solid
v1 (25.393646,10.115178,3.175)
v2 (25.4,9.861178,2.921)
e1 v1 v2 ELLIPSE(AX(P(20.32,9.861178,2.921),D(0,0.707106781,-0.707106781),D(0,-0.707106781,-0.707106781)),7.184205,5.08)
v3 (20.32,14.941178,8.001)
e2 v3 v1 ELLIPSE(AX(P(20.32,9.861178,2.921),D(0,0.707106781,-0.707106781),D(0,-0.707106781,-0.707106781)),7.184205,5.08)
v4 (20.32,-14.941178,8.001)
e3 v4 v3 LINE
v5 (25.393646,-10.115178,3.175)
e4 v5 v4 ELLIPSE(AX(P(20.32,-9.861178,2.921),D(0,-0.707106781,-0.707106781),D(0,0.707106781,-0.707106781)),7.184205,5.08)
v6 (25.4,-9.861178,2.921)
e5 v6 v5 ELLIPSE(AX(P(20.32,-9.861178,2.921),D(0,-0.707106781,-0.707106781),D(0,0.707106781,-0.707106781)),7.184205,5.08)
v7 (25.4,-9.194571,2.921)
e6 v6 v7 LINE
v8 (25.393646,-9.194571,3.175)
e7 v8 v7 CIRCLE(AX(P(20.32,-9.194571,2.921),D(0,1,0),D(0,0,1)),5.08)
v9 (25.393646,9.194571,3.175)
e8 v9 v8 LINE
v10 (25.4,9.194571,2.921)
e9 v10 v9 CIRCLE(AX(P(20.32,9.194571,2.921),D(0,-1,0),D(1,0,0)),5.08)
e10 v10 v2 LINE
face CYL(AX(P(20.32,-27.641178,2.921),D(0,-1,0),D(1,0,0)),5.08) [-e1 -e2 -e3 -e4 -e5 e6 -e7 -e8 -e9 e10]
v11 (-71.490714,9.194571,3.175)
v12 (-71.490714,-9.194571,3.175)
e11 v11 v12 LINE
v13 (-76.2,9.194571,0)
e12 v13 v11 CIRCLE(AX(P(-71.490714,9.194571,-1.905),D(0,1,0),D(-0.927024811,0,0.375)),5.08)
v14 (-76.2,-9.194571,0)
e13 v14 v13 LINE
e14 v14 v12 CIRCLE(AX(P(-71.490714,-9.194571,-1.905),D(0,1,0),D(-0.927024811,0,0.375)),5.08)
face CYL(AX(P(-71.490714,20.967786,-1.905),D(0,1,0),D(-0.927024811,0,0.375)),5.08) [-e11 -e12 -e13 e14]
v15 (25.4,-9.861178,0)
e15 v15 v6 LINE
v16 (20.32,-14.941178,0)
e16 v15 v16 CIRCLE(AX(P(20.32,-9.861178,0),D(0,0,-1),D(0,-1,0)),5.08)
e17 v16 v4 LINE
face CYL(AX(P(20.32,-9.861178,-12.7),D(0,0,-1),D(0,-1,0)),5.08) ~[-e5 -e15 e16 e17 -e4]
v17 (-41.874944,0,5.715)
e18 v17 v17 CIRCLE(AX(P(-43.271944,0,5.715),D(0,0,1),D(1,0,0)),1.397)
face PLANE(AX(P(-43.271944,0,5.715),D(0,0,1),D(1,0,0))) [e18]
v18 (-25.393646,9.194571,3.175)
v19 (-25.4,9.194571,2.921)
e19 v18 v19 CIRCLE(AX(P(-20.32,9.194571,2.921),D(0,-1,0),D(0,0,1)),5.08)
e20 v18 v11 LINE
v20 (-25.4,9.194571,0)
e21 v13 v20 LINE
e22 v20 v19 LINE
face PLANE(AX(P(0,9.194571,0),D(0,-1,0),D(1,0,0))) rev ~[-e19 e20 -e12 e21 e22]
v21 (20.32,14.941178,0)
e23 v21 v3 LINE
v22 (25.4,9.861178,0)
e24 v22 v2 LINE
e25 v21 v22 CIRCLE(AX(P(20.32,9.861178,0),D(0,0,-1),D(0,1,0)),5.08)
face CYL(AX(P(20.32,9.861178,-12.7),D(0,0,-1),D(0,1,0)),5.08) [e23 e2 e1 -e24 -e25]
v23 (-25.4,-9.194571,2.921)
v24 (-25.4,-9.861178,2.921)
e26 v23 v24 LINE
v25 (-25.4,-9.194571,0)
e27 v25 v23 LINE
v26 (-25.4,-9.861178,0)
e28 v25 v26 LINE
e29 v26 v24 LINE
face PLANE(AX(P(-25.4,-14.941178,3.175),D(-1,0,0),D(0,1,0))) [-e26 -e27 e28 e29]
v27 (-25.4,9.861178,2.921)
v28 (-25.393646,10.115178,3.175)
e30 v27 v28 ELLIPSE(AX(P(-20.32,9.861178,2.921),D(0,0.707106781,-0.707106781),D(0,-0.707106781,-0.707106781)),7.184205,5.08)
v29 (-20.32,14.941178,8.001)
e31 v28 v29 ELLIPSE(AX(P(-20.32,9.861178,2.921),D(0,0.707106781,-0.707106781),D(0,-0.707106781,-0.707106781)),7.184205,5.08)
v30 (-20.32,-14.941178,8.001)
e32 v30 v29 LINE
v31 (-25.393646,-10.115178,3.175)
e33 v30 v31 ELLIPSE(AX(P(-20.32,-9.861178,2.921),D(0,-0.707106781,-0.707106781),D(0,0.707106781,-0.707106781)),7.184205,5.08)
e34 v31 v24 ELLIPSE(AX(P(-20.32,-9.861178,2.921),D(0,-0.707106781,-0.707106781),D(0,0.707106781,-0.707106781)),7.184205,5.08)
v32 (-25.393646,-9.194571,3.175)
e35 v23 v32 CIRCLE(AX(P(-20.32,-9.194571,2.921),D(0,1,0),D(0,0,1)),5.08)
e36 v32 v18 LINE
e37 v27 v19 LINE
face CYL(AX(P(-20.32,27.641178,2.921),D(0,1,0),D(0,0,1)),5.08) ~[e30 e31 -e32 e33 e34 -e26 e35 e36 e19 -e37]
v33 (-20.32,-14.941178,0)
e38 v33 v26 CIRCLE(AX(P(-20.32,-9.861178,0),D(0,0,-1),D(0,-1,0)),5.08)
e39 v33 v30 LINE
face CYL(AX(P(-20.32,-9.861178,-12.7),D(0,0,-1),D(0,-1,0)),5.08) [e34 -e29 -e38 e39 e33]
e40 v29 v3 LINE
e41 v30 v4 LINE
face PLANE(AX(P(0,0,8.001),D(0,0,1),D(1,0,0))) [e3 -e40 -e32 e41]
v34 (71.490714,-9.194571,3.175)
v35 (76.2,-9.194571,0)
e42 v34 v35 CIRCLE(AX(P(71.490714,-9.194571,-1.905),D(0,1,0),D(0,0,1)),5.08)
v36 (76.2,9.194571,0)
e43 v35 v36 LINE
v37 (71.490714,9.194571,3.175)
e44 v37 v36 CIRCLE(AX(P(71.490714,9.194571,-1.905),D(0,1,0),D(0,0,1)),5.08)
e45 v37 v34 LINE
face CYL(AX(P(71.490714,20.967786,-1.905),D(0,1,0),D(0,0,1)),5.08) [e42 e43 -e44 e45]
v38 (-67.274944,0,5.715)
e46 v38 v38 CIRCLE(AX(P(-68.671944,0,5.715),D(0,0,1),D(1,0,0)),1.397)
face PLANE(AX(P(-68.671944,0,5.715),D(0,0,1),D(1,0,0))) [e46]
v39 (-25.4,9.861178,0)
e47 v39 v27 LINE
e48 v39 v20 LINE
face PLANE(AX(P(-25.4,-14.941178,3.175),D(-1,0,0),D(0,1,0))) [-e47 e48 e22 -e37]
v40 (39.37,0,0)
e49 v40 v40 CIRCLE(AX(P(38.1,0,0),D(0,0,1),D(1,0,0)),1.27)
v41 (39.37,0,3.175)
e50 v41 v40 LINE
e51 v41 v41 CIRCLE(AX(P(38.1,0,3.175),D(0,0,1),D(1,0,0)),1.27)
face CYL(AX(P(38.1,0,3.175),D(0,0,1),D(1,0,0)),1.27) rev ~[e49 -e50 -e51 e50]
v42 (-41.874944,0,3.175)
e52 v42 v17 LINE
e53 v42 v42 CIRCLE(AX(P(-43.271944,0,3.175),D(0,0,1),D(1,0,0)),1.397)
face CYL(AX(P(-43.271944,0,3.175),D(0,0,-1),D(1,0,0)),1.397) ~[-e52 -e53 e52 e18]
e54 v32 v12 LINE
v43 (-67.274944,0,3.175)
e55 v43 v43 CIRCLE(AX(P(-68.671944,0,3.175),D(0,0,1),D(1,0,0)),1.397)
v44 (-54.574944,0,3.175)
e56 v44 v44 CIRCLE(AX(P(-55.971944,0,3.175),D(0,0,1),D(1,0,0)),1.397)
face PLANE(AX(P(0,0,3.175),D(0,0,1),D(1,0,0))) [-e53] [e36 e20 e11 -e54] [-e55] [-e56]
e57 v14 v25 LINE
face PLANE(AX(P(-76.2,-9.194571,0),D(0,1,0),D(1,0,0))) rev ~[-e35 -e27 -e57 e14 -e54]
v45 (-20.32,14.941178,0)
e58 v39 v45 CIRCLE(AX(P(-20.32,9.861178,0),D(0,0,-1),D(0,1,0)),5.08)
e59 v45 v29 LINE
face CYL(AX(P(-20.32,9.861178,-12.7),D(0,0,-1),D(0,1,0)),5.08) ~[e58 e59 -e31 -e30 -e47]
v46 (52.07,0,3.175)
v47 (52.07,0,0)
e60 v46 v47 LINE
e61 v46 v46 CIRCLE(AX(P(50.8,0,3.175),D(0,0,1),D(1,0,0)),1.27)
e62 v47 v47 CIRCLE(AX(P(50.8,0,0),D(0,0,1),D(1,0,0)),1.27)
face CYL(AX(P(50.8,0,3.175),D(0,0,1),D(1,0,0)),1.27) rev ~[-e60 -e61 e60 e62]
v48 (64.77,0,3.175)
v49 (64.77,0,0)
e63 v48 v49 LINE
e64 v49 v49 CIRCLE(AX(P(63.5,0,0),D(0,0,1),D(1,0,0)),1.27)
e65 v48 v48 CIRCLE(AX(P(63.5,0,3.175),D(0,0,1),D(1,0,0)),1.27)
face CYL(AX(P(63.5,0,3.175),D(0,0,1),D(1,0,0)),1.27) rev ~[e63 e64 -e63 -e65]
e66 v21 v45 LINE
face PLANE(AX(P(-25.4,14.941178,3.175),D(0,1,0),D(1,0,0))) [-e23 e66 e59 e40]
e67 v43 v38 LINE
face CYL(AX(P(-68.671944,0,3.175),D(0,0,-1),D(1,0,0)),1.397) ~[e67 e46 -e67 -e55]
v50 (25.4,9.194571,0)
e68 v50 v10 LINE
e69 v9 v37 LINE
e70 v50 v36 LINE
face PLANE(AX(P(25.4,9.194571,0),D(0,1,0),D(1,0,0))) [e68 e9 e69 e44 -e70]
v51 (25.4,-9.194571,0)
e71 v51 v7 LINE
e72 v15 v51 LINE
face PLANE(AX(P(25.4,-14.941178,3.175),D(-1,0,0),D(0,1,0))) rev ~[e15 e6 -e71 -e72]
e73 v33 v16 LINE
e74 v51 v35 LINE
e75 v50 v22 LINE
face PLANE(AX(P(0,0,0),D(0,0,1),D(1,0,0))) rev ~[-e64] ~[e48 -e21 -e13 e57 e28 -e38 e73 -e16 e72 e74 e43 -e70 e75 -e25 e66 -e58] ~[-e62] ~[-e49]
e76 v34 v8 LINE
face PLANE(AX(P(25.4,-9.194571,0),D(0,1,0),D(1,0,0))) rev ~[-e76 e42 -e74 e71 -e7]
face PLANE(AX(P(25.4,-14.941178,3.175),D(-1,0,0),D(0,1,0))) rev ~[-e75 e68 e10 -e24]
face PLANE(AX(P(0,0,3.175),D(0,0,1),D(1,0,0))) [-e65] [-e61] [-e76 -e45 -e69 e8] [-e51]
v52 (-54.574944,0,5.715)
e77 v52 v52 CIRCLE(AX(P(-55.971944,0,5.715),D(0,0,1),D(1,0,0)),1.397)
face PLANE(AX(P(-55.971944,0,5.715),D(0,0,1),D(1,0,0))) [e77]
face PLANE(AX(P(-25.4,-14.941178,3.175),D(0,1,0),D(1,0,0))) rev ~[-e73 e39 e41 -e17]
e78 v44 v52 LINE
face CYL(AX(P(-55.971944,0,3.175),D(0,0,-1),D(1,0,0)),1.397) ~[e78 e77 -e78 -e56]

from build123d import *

# Parameters (mm, degrees)
F0_W         = 50.8
F0_H         = 18.3891410583
F1_DEPTH     = 3.175
F2_R         = 1.27
F3_DEPTH     = 25.4
F4_R         = 1.397
F5_DEPTH     = 2.54
F6_W         = 50.8
F6_H         = 29.8823560312
F7_DEPTH     = 4.826
F8_T1_DEPTH  = 33.401
F8_T6_DEPTH  = 55.2823560312
F8_T12_DEPTH = 55.2823560312
F8_T18_DEPTH = 55.2823560312
F8_T25_DEPTH = 55.2823560312
F8_T31_DEPTH = 55.2823560312
F8_T37_DEPTH = 55.2823560312
F8_T43_DEPTH = 55.2823560312
F8_T49_DEPTH = 55.2823560312
F8_T56_DEPTH = 55.2823560312
F8_T62_DEPTH = 55.2823560312
F9_T1_DEPTH  = 41.9355712549


# Not quite as in the source:
# - a fillet or chamfer that OpenCascade refuses, or shapes differently, is made with other operations: its cross-section is extruded or revolved along the edge and cut away or added


with BuildPart() as f1:
    # F0 (on Top) → F1 (new body)
    with BuildSketch(Plane.XY):
        Polygon((-25.4, -14.9411780156), (25.4, -14.9411780156), (25.4, -9.1945705292), (25.4, 9.1945705292), (25.4, 14.9411780156), (-25.4, 14.9411780156), (-25.4, 9.1945705292), (-25.4, -9.1945705292), align=None)
        with Locations((50.8, 0)):
            Rectangle(F0_W, F0_H)
        with Locations((-50.8, 0)):
            Rectangle(F0_W, F0_H)
    extrude(amount=F1_DEPTH)

    # F2 (on face) → F3 (cut)
    with BuildSketch(Plane.XY.offset(3.175)):
        with Locations((63.5, 0)):
            Circle(F2_R)
        with Locations((50.8, 0)):
            Circle(F2_R)
        with Locations((38.1, 0)):
            Circle(F2_R)
    extrude(amount=-F3_DEPTH, mode=Mode.SUBTRACT)

    # F4 (on face) → F5 (join)
    with BuildSketch(Plane.XY.offset(3.175)):
        with Locations((-68.6719441229, 0)):
            Circle(F4_R)
        with Locations((-55.9719441229, 0)):
            Circle(F4_R)
        with Locations((-43.2719441229, 0)):
            Circle(F4_R)
    extrude(amount=F5_DEPTH)

    # F6 (on face) → F7 (join)
    with BuildSketch(Plane.XY.offset(3.175)):
        Rectangle(F6_W, F6_H)
    extrude(amount=F7_DEPTH)

    # F8: fillet of radius 5.08 on 6 edges, made by hand

    # F8_s2 → F8_t1 (cut)
    with BuildSketch(Plane.XY.offset(-12.7)):
        with BuildLine():
            ThreePointArc((-20.32, 14.9411780156), (-23.9121024484, 13.453280464), (-25.4, 9.8611780156))
            Line((-25.4, 9.8611780156), (-25.4, 14.9411780156))
            Line((-25.4, 14.9411780156), (-20.32, 14.9411780156))
        make_face()
        with BuildLine():
            ThreePointArc((-20.32, -14.9411780156), (-23.9121024484, -13.453280464), (-25.4, -9.8611780156))
            Line((-25.4, -9.8611780156), (-25.4, -14.9411780156))
            Line((-25.4, -14.9411780156), (-20.32, -14.9411780156))
        make_face()
        with BuildLine():
            ThreePointArc((20.32, -14.9411780156), (23.9121024484, -13.453280464), (25.4, -9.8611780156))
            Line((25.4, -9.8611780156), (25.4, -14.9411780156))
            Line((25.4, -14.9411780156), (20.32, -14.9411780156))
        make_face()
        with BuildLine():
            ThreePointArc((20.32, 14.9411780156), (23.9121024484, 13.453280464), (25.4, 9.8611780156))
            Line((25.4, 9.8611780156), (25.4, 14.9411780156))
            Line((25.4, 14.9411780156), (20.32, 14.9411780156))
        make_face()
    extrude(amount=F8_T1_DEPTH, mode=Mode.SUBTRACT)


with BuildPart() as f8_tool4:
    # F8_s5 → F8_t6 (new body)
    with BuildSketch(Plane.XZ.offset(27.6411780156)):
        with BuildLine():
            ThreePointArc((25.4, 2.921), (23.9121024484, 6.5131024484), (20.32, 8.001))
            Line((20.32, 8.001), (25.4, 8.001))
            Line((25.4, 8.001), (25.4, 2.921))
        make_face()
    extrude(amount=-F8_T6_DEPTH)

    split(bisect_by=Plane.XY.offset(3.175), keep=Keep.BOTTOM)

    split(bisect_by=Plane.XZ.offset(9.1945705292), keep=Keep.TOP)


with BuildPart() as f1_1:
    add(f1.part)

    # F8_t3: cut F8_tool4
    add(f8_tool4.part, mode=Mode.SUBTRACT)


with BuildPart() as f8_tool10:
    # F8_s11 → F8_t12 (new body)
    with BuildSketch(Plane.XZ.offset(27.6411780156)):
        with BuildLine():
            ThreePointArc((25.4, 2.921), (23.9121024484, 6.5131024484), (20.32, 8.001))
            Line((20.32, 8.001), (25.4, 8.001))
            Line((25.4, 8.001), (25.4, 2.921))
        make_face()
    extrude(amount=-F8_T12_DEPTH)

    split(bisect_by=Plane.XY.offset(3.175), keep=Keep.TOP)

    split(bisect_by=Plane.XZ.offset(9.1945705292), keep=Keep.TOP)


with BuildPart() as f1_2:
    add(f1_1.part)

    # F8_t9: cut F8_tool10
    add(f8_tool10.part, mode=Mode.SUBTRACT)


with BuildPart() as f8_tool16:
    # F8_s17 → F8_t18 (new body)
    with BuildSketch(Plane.XZ.offset(27.6411780156)):
        with BuildLine():
            ThreePointArc((25.4, 2.921), (23.9121024484, 6.5131024484), (20.32, 8.001))
            Line((20.32, 8.001), (25.4, 8.001))
            Line((25.4, 8.001), (25.4, 2.921))
        make_face()
    extrude(amount=-F8_T18_DEPTH)

    split(bisect_by=Plane.XY.offset(3.175), keep=Keep.TOP)

    split(bisect_by=Plane.XZ.offset(-9.1945705292), keep=Keep.TOP)

    split(bisect_by=Plane.XZ.offset(9.1945705292), keep=Keep.BOTTOM)


with BuildPart() as f1_3:
    add(f1_2.part)

    # F8_t15: cut F8_tool16
    add(f8_tool16.part, mode=Mode.SUBTRACT)


with BuildPart() as f8_tool23:
    # F8_s24 → F8_t25 (new body)
    with BuildSketch(Plane.XZ.offset(27.6411780156)):
        with BuildLine():
            ThreePointArc((25.4, 2.921), (23.9121024484, 6.5131024484), (20.32, 8.001))
            Line((20.32, 8.001), (25.4, 8.001))
            Line((25.4, 8.001), (25.4, 2.921))
        make_face()
    extrude(amount=-F8_T25_DEPTH)

    split(bisect_by=Plane.XY.offset(3.175), keep=Keep.BOTTOM)

    split(bisect_by=Plane.XZ.offset(-9.1945705292), keep=Keep.BOTTOM)


with BuildPart() as f1_4:
    add(f1_3.part)

    # F8_t22: cut F8_tool23
    add(f8_tool23.part, mode=Mode.SUBTRACT)


with BuildPart() as f8_tool29:
    # F8_s30 → F8_t31 (new body)
    with BuildSketch(Plane.XZ.offset(27.6411780156)):
        with BuildLine():
            ThreePointArc((25.4, 2.921), (23.9121024484, 6.5131024484), (20.32, 8.001))
            Line((20.32, 8.001), (25.4, 8.001))
            Line((25.4, 8.001), (25.4, 2.921))
        make_face()
    extrude(amount=-F8_T31_DEPTH)

    split(bisect_by=Plane.XY.offset(3.175), keep=Keep.TOP)

    split(bisect_by=Plane.XZ.offset(-9.1945705292), keep=Keep.BOTTOM)


with BuildPart() as f1_5:
    add(f1_4.part)

    # F8_t28: cut F8_tool29
    add(f8_tool29.part, mode=Mode.SUBTRACT)


with BuildPart() as f8_tool35:
    # F8_s36 → F8_t37 (new body)
    with BuildSketch(Plane.XZ.offset(-27.6411780156)):
        with BuildLine():
            ThreePointArc((-20.32, 8.001), (-23.9121024484, 6.5131024484), (-25.4, 2.921))
            Line((-25.4, 2.921), (-25.4, 8.001))
            Line((-25.4, 8.001), (-20.32, 8.001))
        make_face()
    extrude(amount=F8_T37_DEPTH)

    split(bisect_by=Plane.XZ.offset(-9.1945705292), keep=Keep.BOTTOM)

    split(bisect_by=Plane.XY.offset(3.175), keep=Keep.TOP)


with BuildPart() as f1_6:
    add(f1_5.part)

    # F8_t34: cut F8_tool35
    add(f8_tool35.part, mode=Mode.SUBTRACT)


with BuildPart() as f8_tool41:
    # F8_s42 → F8_t43 (new body)
    with BuildSketch(Plane.XZ.offset(-27.6411780156)):
        with BuildLine():
            ThreePointArc((-20.32, 8.001), (-23.9121024484, 6.5131024484), (-25.4, 2.921))
            Line((-25.4, 2.921), (-25.4, 8.001))
            Line((-25.4, 8.001), (-20.32, 8.001))
        make_face()
    extrude(amount=F8_T43_DEPTH)

    split(bisect_by=Plane.XZ.offset(-9.1945705292), keep=Keep.BOTTOM)

    split(bisect_by=Plane.XY.offset(3.175), keep=Keep.BOTTOM)


with BuildPart() as f1_7:
    add(f1_6.part)

    # F8_t40: cut F8_tool41
    add(f8_tool41.part, mode=Mode.SUBTRACT)


with BuildPart() as f8_tool47:
    # F8_s48 → F8_t49 (new body)
    with BuildSketch(Plane.XZ.offset(-27.6411780156)):
        with BuildLine():
            ThreePointArc((-20.32, 8.001), (-23.9121024484, 6.5131024484), (-25.4, 2.921))
            Line((-25.4, 2.921), (-25.4, 8.001))
            Line((-25.4, 8.001), (-20.32, 8.001))
        make_face()
    extrude(amount=F8_T49_DEPTH)

    split(bisect_by=Plane.XZ.offset(-9.1945705292), keep=Keep.TOP)

    split(bisect_by=Plane.XY.offset(3.175), keep=Keep.TOP)

    split(bisect_by=Plane.XZ.offset(9.1945705292), keep=Keep.BOTTOM)


with BuildPart() as f1_8:
    add(f1_7.part)

    # F8_t46: cut F8_tool47
    add(f8_tool47.part, mode=Mode.SUBTRACT)


with BuildPart() as f8_tool54:
    # F8_s55 → F8_t56 (new body)
    with BuildSketch(Plane.XZ.offset(-27.6411780156)):
        with BuildLine():
            ThreePointArc((-20.32, 8.001), (-23.9121024484, 6.5131024484), (-25.4, 2.921))
            Line((-25.4, 2.921), (-25.4, 8.001))
            Line((-25.4, 8.001), (-20.32, 8.001))
        make_face()
    extrude(amount=F8_T56_DEPTH)

    split(bisect_by=Plane.XY.offset(3.175), keep=Keep.TOP)

    split(bisect_by=Plane.XZ.offset(9.1945705292), keep=Keep.TOP)


with BuildPart() as f1_9:
    add(f1_8.part)

    # F8_t53: cut F8_tool54
    add(f8_tool54.part, mode=Mode.SUBTRACT)


with BuildPart() as f8_tool60:
    # F8_s61 → F8_t62 (new body)
    with BuildSketch(Plane.XZ.offset(-27.6411780156)):
        with BuildLine():
            ThreePointArc((-20.32, 8.001), (-23.9121024484, 6.5131024484), (-25.4, 2.921))
            Line((-25.4, 2.921), (-25.4, 8.001))
            Line((-25.4, 8.001), (-20.32, 8.001))
        make_face()
    extrude(amount=F8_T62_DEPTH)

    split(bisect_by=Plane.XY.offset(3.175), keep=Keep.BOTTOM)

    split(bisect_by=Plane.XZ.offset(9.1945705292), keep=Keep.TOP)


with BuildPart() as f1_10:
    add(f1_9.part)

    # F8_t59: cut F8_tool60
    add(f8_tool60.part, mode=Mode.SUBTRACT)

    # F9: fillet of radius 5.08 on 2 edges, made by hand

    # F9_s2 → F9_t1 (cut)
    with BuildSketch(Plane.XZ.offset(-20.9677856274)):
        with BuildLine():
            ThreePointArc((71.4907139607, 3.175), (74.3305202921, 2.3071134838), (76.2, 0))
            Line((76.2, 0), (76.2, 3.175))
            Line((76.2, 3.175), (71.4907139607, 3.175))
        make_face()
        with BuildLine():
            ThreePointArc((-76.2, 0), (-74.3305202921, 2.3071134838), (-71.4907139607, 3.175))
            Line((-71.4907139607, 3.175), (-76.2, 3.175))
            Line((-76.2, 3.175), (-76.2, 0))
        make_face()
    extrude(amount=F9_T1_DEPTH, mode=Mode.SUBTRACT)


solid = f1_10.part
